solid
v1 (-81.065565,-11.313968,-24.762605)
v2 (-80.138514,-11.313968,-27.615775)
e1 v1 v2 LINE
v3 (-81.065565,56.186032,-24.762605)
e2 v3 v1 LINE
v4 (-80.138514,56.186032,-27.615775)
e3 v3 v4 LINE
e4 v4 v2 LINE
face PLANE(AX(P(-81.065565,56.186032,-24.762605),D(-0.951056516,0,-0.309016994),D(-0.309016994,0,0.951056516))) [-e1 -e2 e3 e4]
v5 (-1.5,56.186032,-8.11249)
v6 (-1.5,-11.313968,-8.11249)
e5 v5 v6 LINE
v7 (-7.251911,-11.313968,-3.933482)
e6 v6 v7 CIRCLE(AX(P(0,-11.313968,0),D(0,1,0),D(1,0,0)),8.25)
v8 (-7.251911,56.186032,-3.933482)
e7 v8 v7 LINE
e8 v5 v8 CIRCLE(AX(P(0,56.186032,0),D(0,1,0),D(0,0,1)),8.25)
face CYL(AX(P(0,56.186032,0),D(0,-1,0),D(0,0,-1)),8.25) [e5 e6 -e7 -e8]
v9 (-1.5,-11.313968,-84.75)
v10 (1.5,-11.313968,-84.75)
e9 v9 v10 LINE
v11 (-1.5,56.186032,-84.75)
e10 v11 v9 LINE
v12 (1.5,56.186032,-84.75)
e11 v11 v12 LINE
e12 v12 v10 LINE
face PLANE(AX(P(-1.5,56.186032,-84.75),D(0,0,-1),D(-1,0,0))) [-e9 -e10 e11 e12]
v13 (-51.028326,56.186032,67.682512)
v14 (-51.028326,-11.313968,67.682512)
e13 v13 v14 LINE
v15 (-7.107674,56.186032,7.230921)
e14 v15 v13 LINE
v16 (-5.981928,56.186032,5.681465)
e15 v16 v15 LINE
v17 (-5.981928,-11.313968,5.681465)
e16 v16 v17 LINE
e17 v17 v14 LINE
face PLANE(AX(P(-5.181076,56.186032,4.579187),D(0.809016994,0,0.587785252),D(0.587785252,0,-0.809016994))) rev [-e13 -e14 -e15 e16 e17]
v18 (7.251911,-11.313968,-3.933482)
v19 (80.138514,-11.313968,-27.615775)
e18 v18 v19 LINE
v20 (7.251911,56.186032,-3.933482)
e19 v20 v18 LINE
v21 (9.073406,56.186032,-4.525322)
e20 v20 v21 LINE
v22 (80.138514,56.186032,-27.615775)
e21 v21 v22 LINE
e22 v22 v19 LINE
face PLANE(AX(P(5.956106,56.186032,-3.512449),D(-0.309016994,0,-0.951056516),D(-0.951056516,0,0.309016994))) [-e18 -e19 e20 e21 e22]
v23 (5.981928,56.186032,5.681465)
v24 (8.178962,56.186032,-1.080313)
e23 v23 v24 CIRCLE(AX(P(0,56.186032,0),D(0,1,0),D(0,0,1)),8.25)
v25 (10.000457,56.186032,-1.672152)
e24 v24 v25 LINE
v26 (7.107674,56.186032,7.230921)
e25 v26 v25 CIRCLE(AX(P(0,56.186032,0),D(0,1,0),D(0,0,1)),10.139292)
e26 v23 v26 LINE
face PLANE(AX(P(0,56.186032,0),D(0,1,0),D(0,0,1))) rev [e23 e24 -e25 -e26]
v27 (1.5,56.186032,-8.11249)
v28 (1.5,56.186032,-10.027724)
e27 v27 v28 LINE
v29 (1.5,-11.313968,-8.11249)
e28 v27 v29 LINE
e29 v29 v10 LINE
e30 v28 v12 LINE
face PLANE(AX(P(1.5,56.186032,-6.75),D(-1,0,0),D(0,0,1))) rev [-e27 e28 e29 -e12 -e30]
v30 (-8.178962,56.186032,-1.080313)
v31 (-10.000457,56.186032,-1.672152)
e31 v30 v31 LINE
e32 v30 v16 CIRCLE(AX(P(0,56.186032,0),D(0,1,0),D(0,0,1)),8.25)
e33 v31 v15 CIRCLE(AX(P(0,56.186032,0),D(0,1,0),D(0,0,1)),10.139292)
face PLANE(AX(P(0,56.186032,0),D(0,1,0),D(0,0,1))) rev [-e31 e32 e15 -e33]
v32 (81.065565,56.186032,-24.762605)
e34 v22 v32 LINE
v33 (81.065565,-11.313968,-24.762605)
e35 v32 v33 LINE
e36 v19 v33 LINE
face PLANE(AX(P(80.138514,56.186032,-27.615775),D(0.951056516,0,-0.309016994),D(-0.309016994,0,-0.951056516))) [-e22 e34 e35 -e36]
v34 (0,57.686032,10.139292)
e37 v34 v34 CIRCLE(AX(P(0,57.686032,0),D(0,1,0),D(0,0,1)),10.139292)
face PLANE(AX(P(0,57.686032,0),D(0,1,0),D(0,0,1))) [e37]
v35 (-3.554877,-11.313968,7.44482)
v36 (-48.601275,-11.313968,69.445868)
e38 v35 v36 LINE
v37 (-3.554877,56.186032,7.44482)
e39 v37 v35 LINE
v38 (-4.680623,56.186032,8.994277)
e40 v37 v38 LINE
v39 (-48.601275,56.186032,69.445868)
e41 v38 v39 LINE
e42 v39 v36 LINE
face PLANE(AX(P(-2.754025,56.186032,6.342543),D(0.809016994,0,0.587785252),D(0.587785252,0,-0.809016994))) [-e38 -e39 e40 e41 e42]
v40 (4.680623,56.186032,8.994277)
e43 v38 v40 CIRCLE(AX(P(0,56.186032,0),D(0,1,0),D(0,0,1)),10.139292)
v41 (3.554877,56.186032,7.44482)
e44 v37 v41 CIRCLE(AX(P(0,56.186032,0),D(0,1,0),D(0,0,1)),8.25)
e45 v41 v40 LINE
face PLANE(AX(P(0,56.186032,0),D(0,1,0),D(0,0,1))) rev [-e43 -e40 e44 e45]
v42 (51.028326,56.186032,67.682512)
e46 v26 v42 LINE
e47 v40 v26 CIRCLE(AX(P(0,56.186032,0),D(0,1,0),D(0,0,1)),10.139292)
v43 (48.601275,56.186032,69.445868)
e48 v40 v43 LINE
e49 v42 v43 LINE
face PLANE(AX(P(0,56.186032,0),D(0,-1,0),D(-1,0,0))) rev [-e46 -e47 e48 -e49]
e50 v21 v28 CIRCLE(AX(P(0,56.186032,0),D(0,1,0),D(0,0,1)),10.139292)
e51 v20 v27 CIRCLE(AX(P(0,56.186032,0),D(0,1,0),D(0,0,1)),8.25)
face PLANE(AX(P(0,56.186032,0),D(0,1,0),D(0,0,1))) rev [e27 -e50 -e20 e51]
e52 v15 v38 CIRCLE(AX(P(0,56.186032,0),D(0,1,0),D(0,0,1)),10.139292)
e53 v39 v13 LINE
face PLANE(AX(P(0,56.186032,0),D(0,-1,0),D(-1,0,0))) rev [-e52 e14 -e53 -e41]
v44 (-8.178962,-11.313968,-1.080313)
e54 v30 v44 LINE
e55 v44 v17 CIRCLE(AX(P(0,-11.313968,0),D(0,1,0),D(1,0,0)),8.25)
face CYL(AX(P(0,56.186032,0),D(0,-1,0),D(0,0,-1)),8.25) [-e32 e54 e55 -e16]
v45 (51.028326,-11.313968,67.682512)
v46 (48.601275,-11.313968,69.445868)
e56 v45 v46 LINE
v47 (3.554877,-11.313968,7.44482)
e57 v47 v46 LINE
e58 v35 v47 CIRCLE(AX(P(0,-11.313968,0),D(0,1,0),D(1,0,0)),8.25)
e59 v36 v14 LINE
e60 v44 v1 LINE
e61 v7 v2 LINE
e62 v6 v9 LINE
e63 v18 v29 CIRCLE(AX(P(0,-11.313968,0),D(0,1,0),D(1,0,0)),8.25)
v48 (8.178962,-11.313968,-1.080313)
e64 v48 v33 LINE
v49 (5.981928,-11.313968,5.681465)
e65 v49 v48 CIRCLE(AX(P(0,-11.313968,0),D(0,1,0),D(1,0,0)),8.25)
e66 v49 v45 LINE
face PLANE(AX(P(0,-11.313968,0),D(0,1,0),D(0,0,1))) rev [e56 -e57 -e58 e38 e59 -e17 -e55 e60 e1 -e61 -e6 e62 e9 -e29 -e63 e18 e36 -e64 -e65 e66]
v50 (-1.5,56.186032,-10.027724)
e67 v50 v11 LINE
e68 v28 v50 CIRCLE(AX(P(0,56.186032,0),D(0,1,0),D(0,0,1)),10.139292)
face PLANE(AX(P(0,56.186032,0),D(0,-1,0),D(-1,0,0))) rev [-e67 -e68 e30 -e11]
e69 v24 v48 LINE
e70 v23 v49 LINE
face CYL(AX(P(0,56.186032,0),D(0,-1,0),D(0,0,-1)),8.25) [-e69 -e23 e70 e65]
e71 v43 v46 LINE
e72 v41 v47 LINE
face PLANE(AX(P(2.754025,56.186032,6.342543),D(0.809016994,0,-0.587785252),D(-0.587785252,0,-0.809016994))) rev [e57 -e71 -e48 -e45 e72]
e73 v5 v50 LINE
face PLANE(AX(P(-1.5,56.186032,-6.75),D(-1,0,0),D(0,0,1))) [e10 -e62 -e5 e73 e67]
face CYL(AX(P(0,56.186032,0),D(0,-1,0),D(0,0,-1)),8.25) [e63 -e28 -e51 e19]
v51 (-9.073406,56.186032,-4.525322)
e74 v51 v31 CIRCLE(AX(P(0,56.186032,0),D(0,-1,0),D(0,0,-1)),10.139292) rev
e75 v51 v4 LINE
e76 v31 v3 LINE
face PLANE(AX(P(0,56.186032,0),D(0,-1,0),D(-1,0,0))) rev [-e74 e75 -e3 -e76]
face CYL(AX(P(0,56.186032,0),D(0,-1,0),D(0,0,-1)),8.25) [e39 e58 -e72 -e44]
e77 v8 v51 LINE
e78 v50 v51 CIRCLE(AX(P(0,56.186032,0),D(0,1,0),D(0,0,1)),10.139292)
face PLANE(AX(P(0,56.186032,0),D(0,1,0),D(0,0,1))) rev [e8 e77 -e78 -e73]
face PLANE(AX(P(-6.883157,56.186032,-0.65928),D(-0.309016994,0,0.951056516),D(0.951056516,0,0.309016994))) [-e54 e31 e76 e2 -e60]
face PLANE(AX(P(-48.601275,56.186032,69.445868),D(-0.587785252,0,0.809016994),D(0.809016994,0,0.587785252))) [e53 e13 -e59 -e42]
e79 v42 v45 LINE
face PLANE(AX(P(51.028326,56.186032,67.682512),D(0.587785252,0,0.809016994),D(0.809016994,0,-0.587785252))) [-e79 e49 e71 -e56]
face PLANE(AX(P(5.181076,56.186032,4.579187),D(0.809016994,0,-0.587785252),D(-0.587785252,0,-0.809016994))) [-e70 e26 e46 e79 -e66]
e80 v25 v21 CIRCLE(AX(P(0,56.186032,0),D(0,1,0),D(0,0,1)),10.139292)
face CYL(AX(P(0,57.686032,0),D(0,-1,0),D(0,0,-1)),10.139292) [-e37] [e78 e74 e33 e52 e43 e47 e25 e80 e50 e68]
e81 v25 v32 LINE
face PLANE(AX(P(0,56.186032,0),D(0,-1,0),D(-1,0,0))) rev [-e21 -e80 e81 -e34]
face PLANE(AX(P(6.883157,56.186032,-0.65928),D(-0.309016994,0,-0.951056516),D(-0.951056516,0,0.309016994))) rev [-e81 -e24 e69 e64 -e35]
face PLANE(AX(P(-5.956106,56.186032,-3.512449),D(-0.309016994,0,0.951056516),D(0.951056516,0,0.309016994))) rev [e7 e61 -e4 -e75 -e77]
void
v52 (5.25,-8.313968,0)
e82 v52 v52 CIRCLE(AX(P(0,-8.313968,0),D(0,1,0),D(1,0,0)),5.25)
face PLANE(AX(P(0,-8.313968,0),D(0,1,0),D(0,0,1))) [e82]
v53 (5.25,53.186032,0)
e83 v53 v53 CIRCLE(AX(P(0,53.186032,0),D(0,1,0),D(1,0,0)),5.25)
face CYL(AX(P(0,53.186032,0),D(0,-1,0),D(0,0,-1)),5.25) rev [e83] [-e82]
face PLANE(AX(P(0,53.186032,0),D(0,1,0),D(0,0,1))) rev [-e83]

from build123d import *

# Parameters (mm, degrees)
EXTRUDE_THIN2_OUTLINE_R   = 5.5
EXTRUDE_THIN2_OUTLINE_R_2 = 3.5
EXTRUDE_THIN2_DEPTH       = 45
EXTRUDE_THIN2_2_OUTLINE_R = 3.5
EXTRUDE_THIN2_2_DEPTH     = 2
EXTRUDE_THIN2_START       = 43
EXTRUDE_THIN2_3_OUTLINE_R = 3.5
EXTRUDE_THIN2_3_DEPTH     = 2
EXTRUDE_THIN2_4_DEPTH     = 45
EXTRUDE_THIN2_5_DEPTH     = 45
EXTRUDE_THIN2_6_DEPTH     = 45
EXTRUDE_THIN2_7_DEPTH     = 45
EXTRUDE_THIN2_8_OUTLINE_W = 2
EXTRUDE_THIN2_8_OUTLINE_H = 52
EXTRUDE_THIN2_8_DEPTH     = 45
SKETCH4_R                 = 5.5
BOSS_EXTRUDE2_DEPTH       = 0.001
SKETCH6_R                 = 6.759527971
BOSS_EXTRUDE3_DEPTH       = 1
SCALE1_SCALE              = 1.5


# Read off the part's stored shape, not the designer's step: Extrude-Thin2
with BuildPart() as part:
    # Extrude-Thin2 outline → Extrude-Thin2 (new body)
    with BuildSketch(Plane(origin=(0, 0, 0), x_dir=(1, 0, 0), z_dir=(0, 1, 0))):
        Circle(EXTRUDE_THIN2_OUTLINE_R)
        Circle(EXTRUDE_THIN2_OUTLINE_R_2, mode=Mode.SUBTRACT)
    extrude(amount=EXTRUDE_THIN2_DEPTH)

    # Extrude-Thin2 2 outline → Extrude-Thin2 2 (add)
    with BuildSketch(Plane(origin=(0, 0, 0), x_dir=(1, 0, 0), z_dir=(0, 1, 0))):
        Circle(EXTRUDE_THIN2_2_OUTLINE_R)
    extrude(amount=EXTRUDE_THIN2_2_DEPTH)

    # Extrude-Thin2 3 outline → Extrude-Thin2 3 (add)
    with BuildSketch(Plane(origin=(0, 0, 0), x_dir=(1, 0, 0), z_dir=(0, 1, 0)).offset(EXTRUDE_THIN2_START)):
        Circle(EXTRUDE_THIN2_3_OUTLINE_R)
    extrude(amount=EXTRUDE_THIN2_3_DEPTH)



with BuildPart() as body_2:
    # Extrude-Thin2 4 outline → Extrude-Thin2 4 (new body)
    with BuildSketch(Plane(origin=(0, 0, 0), x_dir=(1, 0, 0), z_dir=(0, 1, 0))):
        Polygon((-3.970737329, 2.341632991), (-53.425676176, 18.410516698), (-54.043710165, 16.508403666), (-4.588771318, 0.439519958), align=None)
    extrude(amount=EXTRUDE_THIN2_4_DEPTH)


with BuildPart() as body_3:
    # Extrude-Thin2 5 outline → Extrude-Thin2 5 (new body)
    with BuildSketch(Plane(origin=(0, 0, 0), x_dir=(1, 0, 0), z_dir=(0, 1, 0))):
        Polygon((-3.45405063, -3.052791222), (-34.018883749, -45.12167493), (-32.40084976, -46.297245434), (-1.836016641, -4.228361727), align=None)
    extrude(amount=EXTRUDE_THIN2_5_DEPTH)


with BuildPart() as body_4:
    # Extrude-Thin2 6 outline → Extrude-Thin2 6 (new body)
    with BuildSketch(Plane(origin=(0, 0, 0), x_dir=(1, 0, 0), z_dir=(0, 1, 0))):
        Polygon((1.836016641, -4.228361727), (32.40084976, -46.297245434), (34.018883749, -45.12167493), (3.45405063, -3.052791222), align=None)
    extrude(amount=EXTRUDE_THIN2_6_DEPTH)


with BuildPart() as body_5:
    # Extrude-Thin2 7 outline → Extrude-Thin2 7 (new body)
    with BuildSketch(Plane(origin=(0, 0, 0), x_dir=(1, 0, 0), z_dir=(0, 1, 0))):
        Polygon((4.588771318, 0.439519958), (54.043710165, 16.508403666), (53.425676176, 18.410516698), (3.970737329, 2.341632991), align=None)
    extrude(amount=EXTRUDE_THIN2_7_DEPTH)


with BuildPart() as body_6:
    # Extrude-Thin2 8 outline → Extrude-Thin2 8 (new body)
    with BuildSketch(Plane(origin=(0, 0, 0), x_dir=(1, 0, 0), z_dir=(0, 1, 0))):
        with Locations((0, 30.5)):
            Rectangle(EXTRUDE_THIN2_8_OUTLINE_W, EXTRUDE_THIN2_8_OUTLINE_H)
    extrude(amount=EXTRUDE_THIN2_8_DEPTH)


with BuildPart() as part_1:
    add(part.part)

    add(body_2.part)  # Boss-Extrude2 merges body 2

    add(body_3.part)  # Boss-Extrude2 merges body 3

    add(body_4.part)  # Boss-Extrude2 merges body 4

    add(body_5.part)  # Boss-Extrude2 merges body 5

    add(body_6.part)  # Boss-Extrude2 merges body 6
    # Sketch4 → Boss-Extrude2 (add)
    with BuildSketch(Plane(origin=(0, 45, 0), x_dir=(1, 0, 0), z_dir=(0, 1, 0))):
        with Locations(Location((0, 0, 0), (0, 0, 79.524318304))):
            Circle(SKETCH4_R)
    extrude(amount=BOSS_EXTRUDE2_DEPTH)

    # Sketch6 → Boss-Extrude3 (add)
    with BuildSketch(Plane(origin=(0, 45, 0), x_dir=(1, 0, 0), z_dir=(0, 1, 0))):
        with Locations(Location((0, 0, 0), (0, 0, 81.492473787))):
            Circle(SKETCH6_R)
    extrude(amount=BOSS_EXTRUDE3_DEPTH)


with BuildPart() as part_2:
    # Scale1: scaled about (0, 22.627935727, 1e-09)
    add(part_1.part.scale(SCALE1_SCALE).moved(Location((0, -11.313967864, -1e-09))))


solid = part_2.part
